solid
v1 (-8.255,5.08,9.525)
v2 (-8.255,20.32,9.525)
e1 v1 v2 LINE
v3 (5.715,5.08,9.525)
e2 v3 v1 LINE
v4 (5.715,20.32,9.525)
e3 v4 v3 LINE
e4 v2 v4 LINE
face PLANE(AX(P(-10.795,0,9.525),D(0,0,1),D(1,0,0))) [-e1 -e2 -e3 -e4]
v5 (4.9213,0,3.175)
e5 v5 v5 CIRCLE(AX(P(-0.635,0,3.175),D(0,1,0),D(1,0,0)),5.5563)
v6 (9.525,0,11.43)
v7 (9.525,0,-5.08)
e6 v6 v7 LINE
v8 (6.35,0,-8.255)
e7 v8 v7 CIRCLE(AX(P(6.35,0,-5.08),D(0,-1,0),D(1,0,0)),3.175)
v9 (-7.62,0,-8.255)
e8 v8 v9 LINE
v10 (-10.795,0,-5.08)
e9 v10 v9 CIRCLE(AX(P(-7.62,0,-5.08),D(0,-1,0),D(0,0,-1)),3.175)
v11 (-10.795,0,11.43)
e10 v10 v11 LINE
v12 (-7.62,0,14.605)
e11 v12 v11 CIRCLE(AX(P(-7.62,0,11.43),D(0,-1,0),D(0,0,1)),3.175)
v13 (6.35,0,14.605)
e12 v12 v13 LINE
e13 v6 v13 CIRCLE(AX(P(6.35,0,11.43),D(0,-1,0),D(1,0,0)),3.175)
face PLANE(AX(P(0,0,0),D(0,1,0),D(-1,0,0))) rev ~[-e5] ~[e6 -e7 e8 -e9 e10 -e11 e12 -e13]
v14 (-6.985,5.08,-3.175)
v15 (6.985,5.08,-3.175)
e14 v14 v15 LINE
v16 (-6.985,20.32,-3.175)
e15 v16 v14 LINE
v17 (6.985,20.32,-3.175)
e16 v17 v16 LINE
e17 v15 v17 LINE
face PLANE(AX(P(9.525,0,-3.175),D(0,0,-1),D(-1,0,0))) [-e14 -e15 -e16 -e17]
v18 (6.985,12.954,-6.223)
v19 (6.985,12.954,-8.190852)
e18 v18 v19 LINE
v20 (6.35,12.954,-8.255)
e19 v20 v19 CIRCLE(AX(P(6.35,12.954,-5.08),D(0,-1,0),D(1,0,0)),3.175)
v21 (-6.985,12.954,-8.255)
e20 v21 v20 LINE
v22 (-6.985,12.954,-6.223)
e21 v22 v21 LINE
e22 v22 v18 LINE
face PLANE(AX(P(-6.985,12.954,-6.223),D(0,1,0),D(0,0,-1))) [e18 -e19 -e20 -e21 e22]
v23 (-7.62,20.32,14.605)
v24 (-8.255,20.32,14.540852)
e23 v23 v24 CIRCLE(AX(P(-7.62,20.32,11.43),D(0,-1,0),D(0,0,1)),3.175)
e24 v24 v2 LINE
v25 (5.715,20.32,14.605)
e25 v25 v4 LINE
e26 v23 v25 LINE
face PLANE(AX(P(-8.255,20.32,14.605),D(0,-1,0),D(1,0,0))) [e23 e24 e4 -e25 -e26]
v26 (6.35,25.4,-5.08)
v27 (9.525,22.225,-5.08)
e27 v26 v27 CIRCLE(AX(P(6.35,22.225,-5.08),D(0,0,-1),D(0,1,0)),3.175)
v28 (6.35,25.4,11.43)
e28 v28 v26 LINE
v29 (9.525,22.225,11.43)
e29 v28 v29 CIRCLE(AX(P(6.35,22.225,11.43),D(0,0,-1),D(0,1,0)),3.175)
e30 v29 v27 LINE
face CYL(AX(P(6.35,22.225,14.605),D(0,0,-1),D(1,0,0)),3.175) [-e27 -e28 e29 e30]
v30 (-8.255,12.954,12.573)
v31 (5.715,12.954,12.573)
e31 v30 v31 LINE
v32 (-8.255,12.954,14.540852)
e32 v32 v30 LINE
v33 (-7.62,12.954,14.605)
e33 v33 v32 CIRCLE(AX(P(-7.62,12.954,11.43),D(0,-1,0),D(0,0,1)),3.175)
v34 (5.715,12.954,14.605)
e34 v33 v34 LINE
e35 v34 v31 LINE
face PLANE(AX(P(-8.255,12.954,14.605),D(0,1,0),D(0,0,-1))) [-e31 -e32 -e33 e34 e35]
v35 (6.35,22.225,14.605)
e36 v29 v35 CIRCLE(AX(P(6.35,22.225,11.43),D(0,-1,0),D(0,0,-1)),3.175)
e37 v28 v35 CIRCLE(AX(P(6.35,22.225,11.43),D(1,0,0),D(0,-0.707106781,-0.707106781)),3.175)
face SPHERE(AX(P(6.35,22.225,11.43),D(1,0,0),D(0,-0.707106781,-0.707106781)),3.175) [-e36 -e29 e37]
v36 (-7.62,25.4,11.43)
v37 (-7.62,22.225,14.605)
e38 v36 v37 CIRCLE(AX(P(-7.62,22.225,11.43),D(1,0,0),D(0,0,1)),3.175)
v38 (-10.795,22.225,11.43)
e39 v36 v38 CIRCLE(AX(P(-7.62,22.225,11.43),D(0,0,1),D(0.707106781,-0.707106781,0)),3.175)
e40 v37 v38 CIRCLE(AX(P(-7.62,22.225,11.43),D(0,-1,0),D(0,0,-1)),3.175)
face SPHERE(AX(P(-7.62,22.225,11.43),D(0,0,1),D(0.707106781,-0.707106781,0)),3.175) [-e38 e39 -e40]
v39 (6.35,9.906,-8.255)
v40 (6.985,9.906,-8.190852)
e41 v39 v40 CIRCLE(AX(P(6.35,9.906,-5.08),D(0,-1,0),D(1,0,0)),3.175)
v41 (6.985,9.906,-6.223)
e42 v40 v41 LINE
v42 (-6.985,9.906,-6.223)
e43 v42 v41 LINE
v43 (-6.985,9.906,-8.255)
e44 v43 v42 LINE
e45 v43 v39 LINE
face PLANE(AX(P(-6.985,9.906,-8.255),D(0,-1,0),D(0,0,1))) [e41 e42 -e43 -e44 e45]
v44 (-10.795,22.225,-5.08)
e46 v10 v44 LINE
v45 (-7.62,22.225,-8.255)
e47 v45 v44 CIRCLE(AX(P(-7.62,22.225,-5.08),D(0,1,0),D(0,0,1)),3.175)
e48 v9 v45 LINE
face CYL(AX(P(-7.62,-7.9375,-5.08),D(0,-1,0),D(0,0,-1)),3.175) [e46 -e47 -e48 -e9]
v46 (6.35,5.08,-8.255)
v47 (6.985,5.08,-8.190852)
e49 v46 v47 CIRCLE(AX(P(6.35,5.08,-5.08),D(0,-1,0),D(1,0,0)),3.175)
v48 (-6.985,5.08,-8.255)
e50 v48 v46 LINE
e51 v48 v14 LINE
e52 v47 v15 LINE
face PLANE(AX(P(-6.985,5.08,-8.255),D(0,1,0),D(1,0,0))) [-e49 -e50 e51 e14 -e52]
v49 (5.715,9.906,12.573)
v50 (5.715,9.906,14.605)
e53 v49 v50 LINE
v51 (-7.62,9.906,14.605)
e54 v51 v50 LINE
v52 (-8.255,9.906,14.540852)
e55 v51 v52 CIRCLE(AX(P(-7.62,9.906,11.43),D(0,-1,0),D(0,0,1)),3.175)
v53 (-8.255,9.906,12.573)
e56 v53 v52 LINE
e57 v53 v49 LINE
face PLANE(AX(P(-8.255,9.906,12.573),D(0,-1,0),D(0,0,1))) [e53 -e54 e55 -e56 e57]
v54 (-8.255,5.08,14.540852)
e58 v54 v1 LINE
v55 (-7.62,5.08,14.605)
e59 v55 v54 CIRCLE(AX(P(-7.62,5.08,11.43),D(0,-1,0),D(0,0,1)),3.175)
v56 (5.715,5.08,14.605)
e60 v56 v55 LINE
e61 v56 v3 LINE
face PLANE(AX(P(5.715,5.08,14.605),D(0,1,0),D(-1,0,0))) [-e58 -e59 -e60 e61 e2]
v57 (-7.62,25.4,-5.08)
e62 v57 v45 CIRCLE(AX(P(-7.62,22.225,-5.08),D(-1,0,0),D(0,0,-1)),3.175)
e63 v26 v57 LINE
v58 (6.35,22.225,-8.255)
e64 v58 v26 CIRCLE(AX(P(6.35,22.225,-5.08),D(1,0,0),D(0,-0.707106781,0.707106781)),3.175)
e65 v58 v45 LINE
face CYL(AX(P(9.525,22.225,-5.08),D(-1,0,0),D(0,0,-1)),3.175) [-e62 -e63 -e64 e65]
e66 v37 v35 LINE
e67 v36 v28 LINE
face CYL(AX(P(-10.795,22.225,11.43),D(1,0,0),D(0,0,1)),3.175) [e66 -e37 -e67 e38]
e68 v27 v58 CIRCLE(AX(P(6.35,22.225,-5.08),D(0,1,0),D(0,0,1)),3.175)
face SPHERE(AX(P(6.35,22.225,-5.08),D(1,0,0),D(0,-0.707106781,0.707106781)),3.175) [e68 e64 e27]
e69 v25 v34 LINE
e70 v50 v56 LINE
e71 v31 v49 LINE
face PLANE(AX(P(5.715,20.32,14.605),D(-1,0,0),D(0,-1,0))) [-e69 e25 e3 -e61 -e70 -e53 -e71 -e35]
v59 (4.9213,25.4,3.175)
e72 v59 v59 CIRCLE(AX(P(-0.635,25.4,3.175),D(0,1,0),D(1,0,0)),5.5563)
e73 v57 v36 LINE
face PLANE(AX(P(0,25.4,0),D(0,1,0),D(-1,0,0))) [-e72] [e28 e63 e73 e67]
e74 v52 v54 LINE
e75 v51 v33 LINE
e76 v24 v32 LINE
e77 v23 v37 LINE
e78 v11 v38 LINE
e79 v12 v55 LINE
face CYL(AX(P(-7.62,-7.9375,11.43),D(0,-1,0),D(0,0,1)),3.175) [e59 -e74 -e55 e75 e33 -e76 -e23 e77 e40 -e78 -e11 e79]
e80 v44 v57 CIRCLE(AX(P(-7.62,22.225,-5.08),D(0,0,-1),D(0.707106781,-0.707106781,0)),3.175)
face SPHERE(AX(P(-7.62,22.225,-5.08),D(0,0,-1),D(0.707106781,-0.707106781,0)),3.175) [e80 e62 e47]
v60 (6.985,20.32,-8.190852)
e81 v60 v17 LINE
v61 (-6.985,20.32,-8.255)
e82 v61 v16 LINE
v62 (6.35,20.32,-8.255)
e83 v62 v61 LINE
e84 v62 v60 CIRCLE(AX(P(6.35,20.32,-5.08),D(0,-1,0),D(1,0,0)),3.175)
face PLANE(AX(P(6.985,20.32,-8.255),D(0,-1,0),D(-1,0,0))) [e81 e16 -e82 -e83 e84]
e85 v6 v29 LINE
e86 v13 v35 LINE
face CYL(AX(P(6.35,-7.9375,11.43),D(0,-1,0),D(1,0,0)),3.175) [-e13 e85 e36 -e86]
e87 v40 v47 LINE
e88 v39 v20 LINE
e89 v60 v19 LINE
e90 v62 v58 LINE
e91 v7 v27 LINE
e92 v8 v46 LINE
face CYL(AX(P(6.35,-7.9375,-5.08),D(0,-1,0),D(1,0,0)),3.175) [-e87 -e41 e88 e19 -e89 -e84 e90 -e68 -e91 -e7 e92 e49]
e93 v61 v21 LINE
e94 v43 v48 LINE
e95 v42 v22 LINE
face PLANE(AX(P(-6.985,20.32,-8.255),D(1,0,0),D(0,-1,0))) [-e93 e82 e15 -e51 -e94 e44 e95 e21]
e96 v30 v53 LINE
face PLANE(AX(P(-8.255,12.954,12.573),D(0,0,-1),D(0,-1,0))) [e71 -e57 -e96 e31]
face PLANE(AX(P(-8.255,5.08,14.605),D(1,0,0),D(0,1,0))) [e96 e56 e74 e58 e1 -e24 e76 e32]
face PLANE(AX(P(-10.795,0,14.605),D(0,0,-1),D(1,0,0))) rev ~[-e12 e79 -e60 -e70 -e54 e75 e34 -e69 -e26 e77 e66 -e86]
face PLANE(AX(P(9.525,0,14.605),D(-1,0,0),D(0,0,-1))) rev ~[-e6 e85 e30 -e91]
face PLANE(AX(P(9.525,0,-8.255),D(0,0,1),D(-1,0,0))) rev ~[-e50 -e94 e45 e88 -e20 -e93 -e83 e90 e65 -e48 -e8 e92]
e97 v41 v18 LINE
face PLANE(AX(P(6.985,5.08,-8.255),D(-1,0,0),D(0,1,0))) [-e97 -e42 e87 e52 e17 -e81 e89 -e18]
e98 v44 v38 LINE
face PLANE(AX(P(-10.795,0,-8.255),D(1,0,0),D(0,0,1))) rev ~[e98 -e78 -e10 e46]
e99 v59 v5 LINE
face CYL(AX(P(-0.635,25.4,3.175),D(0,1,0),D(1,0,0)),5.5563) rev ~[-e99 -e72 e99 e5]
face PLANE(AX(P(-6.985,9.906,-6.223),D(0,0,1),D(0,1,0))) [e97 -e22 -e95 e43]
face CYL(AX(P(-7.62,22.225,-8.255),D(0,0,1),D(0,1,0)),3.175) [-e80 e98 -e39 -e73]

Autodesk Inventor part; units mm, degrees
ref_plane "YZ Plane" through (0, 0, 0) normal (1, 0, 0) x (0, 1, 0)
ref_plane "XZ Plane" through (0, 0, 0) normal (0, 1, 0) x (-1, 0, 0)
ref_plane "XY Plane" through (0, 0, 0) normal (0, 0, 1) x (1, 0, 0)
sketch "Sketch1" plane through (0, 0, 0) normal (0, 1, 0) x (-1, 0, 0)
  line L0 (-9.525, -8.255) -> (10.795, -8.255)
  line L1 (10.795, -8.255) -> (10.795, 14.605)
  line L2 (10.795, 14.605) -> (-9.525, 14.605)
  line L3 (-9.525, 14.605) -> (-9.525, -8.255)
  line L4 (-9.525, -8.255) -> (10.795, 14.605) construction
  line L5 (10.795, -8.255) -> (-9.525, 14.605) construction
  point P0 (0.635, 3.175)
  dimension "d9" = 20.32
  dimension "d10" = 22.86
extrude "Extrusion3" add sketch "Sketch1" along normal blind 25.4
sketch "actual_circle" plane through (0, 25.4, 0) normal (0, 1, 0) x (1, 0, 0)
  circle A0 centre (-0.635, -3.175) radius 5.5563
  line L0 (9.525, 8.255) -> (-10.795, 8.255) projected
  line L1 (-10.795, 8.255) -> (-10.795, -14.605) projected
  dimension "d27" = 11.1125
  dimension "d57" = 11.43
  dimension "d58" = 10.16
extrude "Extrusion6" cut sketch "actual_circle" against normal blind 50.8
sketch "circle" plane through (-10.795, 0, 14.605) normal (0, 0, 1) x (1, 0, 0)
  line L0 (2.54, 20.32) -> (16.51, 20.32)
  line L1 (16.51, 20.32) -> (16.51, 5.08)
  line L2 (16.51, 5.08) -> (2.54, 5.08)
  line L3 (2.54, 5.08) -> (2.54, 20.32)
  line L4 (0, 25.4) -> (20.32, 25.4) projected
  line L5 (0, 0) -> (0, 25.4) projected
  point P0 (10.795, 0)
  dimension "d32" = 13.97
  dimension "d33" = 15.24
  dimension "d34" = 5.08
  dimension "d35" = 2.54
extrude "Extrusion7" cut sketch "circle" against normal blind 5.08
sketch "Sketch7" plane through (9.525, 0, -8.255) normal (0, 0, -1) x (-1, 0, 0)
  line L0 (2.54, 20.32) -> (16.51, 20.32)
  line L1 (16.51, 20.32) -> (16.51, 5.08)
  line L2 (16.51, 5.08) -> (2.54, 5.08)
  line L3 (2.54, 5.08) -> (2.54, 20.32)
  line L4 (0, 0) -> (0, 25.4) projected
  line L5 (0, 25.4) -> (20.32, 25.4) projected
  point P0 (9.525, 0)
  dimension "d38" = 13.97
  dimension "d39" = 15.24
  dimension "d40" = 2.54
  dimension "d41" = 5.08
extrude "Extrusion8" cut sketch "Sketch7" against normal blind 5.08
sketch "Lock" plane through (-6.985, 5.08, -8.255) normal (1, 0, 0) x (0, 0, -1)
  line L0 (-2.032, 7.874) -> (0, 7.874)
  line L1 (0, 7.874) -> (0, 4.826)
  line L2 (0, 4.826) -> (-2.032, 4.826)
  line L3 (-2.032, 4.826) -> (-2.032, 7.874)
  line L4 (-5.08, 15.24) -> (-5.08, 0) projected
  line L5 (0, 15.24) -> (0, 0) projected
  point P0 (-8.255, -5.08)
  dimension "d44" = 2.032
  dimension "d45" = 3.048
  dimension "d46" = 7.366
  dimension "d59" = 0
extrude "Extrusion9" add sketch "Lock" along normal blind 13.97
sketch "Sketch9" plane through (-8.255, 5.08, 14.605) normal (1, 0, 0) x (0, 0, -1)
  line L0 (0, 7.874) -> (2.032, 7.874)
  line L1 (2.032, 7.874) -> (2.032, 4.826)
  line L2 (2.032, 4.826) -> (0, 4.826)
  line L3 (0, 4.826) -> (0, 7.874)
  line L4 (0, 0) -> (0, 15.24) projected
  point P0 (14.605, -5.08)
  dimension "d50" = 2.032
  dimension "d51" = 3.048
  dimension "d52" = 0
  dimension "d53" = 7.366
extrude "Extrusion10" add sketch "Sketch9" along normal blind 13.97
fillet "Fillet1" radius 3.175 4 edges at (-10.795, 25.4, 3.175) (9.525, 25.4, 3.175) (-0.635, 25.4, 14.605) (-0.635, 25.4, -8.255)
fillet "Fillet2" radius 3.175 8 edges at (8.5951, 24.4701, 13.6751) (9.525, 11.1125, 14.605) (8.5951, 24.4701, -7.3251) (9.525, 11.1125, -8.255) (-9.8651, 24.4701, -7.3251) (-10.795, 11.1125, -8.255) (-9.8651, 24.4701, 13.6751) (-10.795, 11.1125, 14.605)
properties part number "TM_Weird_Box_LMMM"
